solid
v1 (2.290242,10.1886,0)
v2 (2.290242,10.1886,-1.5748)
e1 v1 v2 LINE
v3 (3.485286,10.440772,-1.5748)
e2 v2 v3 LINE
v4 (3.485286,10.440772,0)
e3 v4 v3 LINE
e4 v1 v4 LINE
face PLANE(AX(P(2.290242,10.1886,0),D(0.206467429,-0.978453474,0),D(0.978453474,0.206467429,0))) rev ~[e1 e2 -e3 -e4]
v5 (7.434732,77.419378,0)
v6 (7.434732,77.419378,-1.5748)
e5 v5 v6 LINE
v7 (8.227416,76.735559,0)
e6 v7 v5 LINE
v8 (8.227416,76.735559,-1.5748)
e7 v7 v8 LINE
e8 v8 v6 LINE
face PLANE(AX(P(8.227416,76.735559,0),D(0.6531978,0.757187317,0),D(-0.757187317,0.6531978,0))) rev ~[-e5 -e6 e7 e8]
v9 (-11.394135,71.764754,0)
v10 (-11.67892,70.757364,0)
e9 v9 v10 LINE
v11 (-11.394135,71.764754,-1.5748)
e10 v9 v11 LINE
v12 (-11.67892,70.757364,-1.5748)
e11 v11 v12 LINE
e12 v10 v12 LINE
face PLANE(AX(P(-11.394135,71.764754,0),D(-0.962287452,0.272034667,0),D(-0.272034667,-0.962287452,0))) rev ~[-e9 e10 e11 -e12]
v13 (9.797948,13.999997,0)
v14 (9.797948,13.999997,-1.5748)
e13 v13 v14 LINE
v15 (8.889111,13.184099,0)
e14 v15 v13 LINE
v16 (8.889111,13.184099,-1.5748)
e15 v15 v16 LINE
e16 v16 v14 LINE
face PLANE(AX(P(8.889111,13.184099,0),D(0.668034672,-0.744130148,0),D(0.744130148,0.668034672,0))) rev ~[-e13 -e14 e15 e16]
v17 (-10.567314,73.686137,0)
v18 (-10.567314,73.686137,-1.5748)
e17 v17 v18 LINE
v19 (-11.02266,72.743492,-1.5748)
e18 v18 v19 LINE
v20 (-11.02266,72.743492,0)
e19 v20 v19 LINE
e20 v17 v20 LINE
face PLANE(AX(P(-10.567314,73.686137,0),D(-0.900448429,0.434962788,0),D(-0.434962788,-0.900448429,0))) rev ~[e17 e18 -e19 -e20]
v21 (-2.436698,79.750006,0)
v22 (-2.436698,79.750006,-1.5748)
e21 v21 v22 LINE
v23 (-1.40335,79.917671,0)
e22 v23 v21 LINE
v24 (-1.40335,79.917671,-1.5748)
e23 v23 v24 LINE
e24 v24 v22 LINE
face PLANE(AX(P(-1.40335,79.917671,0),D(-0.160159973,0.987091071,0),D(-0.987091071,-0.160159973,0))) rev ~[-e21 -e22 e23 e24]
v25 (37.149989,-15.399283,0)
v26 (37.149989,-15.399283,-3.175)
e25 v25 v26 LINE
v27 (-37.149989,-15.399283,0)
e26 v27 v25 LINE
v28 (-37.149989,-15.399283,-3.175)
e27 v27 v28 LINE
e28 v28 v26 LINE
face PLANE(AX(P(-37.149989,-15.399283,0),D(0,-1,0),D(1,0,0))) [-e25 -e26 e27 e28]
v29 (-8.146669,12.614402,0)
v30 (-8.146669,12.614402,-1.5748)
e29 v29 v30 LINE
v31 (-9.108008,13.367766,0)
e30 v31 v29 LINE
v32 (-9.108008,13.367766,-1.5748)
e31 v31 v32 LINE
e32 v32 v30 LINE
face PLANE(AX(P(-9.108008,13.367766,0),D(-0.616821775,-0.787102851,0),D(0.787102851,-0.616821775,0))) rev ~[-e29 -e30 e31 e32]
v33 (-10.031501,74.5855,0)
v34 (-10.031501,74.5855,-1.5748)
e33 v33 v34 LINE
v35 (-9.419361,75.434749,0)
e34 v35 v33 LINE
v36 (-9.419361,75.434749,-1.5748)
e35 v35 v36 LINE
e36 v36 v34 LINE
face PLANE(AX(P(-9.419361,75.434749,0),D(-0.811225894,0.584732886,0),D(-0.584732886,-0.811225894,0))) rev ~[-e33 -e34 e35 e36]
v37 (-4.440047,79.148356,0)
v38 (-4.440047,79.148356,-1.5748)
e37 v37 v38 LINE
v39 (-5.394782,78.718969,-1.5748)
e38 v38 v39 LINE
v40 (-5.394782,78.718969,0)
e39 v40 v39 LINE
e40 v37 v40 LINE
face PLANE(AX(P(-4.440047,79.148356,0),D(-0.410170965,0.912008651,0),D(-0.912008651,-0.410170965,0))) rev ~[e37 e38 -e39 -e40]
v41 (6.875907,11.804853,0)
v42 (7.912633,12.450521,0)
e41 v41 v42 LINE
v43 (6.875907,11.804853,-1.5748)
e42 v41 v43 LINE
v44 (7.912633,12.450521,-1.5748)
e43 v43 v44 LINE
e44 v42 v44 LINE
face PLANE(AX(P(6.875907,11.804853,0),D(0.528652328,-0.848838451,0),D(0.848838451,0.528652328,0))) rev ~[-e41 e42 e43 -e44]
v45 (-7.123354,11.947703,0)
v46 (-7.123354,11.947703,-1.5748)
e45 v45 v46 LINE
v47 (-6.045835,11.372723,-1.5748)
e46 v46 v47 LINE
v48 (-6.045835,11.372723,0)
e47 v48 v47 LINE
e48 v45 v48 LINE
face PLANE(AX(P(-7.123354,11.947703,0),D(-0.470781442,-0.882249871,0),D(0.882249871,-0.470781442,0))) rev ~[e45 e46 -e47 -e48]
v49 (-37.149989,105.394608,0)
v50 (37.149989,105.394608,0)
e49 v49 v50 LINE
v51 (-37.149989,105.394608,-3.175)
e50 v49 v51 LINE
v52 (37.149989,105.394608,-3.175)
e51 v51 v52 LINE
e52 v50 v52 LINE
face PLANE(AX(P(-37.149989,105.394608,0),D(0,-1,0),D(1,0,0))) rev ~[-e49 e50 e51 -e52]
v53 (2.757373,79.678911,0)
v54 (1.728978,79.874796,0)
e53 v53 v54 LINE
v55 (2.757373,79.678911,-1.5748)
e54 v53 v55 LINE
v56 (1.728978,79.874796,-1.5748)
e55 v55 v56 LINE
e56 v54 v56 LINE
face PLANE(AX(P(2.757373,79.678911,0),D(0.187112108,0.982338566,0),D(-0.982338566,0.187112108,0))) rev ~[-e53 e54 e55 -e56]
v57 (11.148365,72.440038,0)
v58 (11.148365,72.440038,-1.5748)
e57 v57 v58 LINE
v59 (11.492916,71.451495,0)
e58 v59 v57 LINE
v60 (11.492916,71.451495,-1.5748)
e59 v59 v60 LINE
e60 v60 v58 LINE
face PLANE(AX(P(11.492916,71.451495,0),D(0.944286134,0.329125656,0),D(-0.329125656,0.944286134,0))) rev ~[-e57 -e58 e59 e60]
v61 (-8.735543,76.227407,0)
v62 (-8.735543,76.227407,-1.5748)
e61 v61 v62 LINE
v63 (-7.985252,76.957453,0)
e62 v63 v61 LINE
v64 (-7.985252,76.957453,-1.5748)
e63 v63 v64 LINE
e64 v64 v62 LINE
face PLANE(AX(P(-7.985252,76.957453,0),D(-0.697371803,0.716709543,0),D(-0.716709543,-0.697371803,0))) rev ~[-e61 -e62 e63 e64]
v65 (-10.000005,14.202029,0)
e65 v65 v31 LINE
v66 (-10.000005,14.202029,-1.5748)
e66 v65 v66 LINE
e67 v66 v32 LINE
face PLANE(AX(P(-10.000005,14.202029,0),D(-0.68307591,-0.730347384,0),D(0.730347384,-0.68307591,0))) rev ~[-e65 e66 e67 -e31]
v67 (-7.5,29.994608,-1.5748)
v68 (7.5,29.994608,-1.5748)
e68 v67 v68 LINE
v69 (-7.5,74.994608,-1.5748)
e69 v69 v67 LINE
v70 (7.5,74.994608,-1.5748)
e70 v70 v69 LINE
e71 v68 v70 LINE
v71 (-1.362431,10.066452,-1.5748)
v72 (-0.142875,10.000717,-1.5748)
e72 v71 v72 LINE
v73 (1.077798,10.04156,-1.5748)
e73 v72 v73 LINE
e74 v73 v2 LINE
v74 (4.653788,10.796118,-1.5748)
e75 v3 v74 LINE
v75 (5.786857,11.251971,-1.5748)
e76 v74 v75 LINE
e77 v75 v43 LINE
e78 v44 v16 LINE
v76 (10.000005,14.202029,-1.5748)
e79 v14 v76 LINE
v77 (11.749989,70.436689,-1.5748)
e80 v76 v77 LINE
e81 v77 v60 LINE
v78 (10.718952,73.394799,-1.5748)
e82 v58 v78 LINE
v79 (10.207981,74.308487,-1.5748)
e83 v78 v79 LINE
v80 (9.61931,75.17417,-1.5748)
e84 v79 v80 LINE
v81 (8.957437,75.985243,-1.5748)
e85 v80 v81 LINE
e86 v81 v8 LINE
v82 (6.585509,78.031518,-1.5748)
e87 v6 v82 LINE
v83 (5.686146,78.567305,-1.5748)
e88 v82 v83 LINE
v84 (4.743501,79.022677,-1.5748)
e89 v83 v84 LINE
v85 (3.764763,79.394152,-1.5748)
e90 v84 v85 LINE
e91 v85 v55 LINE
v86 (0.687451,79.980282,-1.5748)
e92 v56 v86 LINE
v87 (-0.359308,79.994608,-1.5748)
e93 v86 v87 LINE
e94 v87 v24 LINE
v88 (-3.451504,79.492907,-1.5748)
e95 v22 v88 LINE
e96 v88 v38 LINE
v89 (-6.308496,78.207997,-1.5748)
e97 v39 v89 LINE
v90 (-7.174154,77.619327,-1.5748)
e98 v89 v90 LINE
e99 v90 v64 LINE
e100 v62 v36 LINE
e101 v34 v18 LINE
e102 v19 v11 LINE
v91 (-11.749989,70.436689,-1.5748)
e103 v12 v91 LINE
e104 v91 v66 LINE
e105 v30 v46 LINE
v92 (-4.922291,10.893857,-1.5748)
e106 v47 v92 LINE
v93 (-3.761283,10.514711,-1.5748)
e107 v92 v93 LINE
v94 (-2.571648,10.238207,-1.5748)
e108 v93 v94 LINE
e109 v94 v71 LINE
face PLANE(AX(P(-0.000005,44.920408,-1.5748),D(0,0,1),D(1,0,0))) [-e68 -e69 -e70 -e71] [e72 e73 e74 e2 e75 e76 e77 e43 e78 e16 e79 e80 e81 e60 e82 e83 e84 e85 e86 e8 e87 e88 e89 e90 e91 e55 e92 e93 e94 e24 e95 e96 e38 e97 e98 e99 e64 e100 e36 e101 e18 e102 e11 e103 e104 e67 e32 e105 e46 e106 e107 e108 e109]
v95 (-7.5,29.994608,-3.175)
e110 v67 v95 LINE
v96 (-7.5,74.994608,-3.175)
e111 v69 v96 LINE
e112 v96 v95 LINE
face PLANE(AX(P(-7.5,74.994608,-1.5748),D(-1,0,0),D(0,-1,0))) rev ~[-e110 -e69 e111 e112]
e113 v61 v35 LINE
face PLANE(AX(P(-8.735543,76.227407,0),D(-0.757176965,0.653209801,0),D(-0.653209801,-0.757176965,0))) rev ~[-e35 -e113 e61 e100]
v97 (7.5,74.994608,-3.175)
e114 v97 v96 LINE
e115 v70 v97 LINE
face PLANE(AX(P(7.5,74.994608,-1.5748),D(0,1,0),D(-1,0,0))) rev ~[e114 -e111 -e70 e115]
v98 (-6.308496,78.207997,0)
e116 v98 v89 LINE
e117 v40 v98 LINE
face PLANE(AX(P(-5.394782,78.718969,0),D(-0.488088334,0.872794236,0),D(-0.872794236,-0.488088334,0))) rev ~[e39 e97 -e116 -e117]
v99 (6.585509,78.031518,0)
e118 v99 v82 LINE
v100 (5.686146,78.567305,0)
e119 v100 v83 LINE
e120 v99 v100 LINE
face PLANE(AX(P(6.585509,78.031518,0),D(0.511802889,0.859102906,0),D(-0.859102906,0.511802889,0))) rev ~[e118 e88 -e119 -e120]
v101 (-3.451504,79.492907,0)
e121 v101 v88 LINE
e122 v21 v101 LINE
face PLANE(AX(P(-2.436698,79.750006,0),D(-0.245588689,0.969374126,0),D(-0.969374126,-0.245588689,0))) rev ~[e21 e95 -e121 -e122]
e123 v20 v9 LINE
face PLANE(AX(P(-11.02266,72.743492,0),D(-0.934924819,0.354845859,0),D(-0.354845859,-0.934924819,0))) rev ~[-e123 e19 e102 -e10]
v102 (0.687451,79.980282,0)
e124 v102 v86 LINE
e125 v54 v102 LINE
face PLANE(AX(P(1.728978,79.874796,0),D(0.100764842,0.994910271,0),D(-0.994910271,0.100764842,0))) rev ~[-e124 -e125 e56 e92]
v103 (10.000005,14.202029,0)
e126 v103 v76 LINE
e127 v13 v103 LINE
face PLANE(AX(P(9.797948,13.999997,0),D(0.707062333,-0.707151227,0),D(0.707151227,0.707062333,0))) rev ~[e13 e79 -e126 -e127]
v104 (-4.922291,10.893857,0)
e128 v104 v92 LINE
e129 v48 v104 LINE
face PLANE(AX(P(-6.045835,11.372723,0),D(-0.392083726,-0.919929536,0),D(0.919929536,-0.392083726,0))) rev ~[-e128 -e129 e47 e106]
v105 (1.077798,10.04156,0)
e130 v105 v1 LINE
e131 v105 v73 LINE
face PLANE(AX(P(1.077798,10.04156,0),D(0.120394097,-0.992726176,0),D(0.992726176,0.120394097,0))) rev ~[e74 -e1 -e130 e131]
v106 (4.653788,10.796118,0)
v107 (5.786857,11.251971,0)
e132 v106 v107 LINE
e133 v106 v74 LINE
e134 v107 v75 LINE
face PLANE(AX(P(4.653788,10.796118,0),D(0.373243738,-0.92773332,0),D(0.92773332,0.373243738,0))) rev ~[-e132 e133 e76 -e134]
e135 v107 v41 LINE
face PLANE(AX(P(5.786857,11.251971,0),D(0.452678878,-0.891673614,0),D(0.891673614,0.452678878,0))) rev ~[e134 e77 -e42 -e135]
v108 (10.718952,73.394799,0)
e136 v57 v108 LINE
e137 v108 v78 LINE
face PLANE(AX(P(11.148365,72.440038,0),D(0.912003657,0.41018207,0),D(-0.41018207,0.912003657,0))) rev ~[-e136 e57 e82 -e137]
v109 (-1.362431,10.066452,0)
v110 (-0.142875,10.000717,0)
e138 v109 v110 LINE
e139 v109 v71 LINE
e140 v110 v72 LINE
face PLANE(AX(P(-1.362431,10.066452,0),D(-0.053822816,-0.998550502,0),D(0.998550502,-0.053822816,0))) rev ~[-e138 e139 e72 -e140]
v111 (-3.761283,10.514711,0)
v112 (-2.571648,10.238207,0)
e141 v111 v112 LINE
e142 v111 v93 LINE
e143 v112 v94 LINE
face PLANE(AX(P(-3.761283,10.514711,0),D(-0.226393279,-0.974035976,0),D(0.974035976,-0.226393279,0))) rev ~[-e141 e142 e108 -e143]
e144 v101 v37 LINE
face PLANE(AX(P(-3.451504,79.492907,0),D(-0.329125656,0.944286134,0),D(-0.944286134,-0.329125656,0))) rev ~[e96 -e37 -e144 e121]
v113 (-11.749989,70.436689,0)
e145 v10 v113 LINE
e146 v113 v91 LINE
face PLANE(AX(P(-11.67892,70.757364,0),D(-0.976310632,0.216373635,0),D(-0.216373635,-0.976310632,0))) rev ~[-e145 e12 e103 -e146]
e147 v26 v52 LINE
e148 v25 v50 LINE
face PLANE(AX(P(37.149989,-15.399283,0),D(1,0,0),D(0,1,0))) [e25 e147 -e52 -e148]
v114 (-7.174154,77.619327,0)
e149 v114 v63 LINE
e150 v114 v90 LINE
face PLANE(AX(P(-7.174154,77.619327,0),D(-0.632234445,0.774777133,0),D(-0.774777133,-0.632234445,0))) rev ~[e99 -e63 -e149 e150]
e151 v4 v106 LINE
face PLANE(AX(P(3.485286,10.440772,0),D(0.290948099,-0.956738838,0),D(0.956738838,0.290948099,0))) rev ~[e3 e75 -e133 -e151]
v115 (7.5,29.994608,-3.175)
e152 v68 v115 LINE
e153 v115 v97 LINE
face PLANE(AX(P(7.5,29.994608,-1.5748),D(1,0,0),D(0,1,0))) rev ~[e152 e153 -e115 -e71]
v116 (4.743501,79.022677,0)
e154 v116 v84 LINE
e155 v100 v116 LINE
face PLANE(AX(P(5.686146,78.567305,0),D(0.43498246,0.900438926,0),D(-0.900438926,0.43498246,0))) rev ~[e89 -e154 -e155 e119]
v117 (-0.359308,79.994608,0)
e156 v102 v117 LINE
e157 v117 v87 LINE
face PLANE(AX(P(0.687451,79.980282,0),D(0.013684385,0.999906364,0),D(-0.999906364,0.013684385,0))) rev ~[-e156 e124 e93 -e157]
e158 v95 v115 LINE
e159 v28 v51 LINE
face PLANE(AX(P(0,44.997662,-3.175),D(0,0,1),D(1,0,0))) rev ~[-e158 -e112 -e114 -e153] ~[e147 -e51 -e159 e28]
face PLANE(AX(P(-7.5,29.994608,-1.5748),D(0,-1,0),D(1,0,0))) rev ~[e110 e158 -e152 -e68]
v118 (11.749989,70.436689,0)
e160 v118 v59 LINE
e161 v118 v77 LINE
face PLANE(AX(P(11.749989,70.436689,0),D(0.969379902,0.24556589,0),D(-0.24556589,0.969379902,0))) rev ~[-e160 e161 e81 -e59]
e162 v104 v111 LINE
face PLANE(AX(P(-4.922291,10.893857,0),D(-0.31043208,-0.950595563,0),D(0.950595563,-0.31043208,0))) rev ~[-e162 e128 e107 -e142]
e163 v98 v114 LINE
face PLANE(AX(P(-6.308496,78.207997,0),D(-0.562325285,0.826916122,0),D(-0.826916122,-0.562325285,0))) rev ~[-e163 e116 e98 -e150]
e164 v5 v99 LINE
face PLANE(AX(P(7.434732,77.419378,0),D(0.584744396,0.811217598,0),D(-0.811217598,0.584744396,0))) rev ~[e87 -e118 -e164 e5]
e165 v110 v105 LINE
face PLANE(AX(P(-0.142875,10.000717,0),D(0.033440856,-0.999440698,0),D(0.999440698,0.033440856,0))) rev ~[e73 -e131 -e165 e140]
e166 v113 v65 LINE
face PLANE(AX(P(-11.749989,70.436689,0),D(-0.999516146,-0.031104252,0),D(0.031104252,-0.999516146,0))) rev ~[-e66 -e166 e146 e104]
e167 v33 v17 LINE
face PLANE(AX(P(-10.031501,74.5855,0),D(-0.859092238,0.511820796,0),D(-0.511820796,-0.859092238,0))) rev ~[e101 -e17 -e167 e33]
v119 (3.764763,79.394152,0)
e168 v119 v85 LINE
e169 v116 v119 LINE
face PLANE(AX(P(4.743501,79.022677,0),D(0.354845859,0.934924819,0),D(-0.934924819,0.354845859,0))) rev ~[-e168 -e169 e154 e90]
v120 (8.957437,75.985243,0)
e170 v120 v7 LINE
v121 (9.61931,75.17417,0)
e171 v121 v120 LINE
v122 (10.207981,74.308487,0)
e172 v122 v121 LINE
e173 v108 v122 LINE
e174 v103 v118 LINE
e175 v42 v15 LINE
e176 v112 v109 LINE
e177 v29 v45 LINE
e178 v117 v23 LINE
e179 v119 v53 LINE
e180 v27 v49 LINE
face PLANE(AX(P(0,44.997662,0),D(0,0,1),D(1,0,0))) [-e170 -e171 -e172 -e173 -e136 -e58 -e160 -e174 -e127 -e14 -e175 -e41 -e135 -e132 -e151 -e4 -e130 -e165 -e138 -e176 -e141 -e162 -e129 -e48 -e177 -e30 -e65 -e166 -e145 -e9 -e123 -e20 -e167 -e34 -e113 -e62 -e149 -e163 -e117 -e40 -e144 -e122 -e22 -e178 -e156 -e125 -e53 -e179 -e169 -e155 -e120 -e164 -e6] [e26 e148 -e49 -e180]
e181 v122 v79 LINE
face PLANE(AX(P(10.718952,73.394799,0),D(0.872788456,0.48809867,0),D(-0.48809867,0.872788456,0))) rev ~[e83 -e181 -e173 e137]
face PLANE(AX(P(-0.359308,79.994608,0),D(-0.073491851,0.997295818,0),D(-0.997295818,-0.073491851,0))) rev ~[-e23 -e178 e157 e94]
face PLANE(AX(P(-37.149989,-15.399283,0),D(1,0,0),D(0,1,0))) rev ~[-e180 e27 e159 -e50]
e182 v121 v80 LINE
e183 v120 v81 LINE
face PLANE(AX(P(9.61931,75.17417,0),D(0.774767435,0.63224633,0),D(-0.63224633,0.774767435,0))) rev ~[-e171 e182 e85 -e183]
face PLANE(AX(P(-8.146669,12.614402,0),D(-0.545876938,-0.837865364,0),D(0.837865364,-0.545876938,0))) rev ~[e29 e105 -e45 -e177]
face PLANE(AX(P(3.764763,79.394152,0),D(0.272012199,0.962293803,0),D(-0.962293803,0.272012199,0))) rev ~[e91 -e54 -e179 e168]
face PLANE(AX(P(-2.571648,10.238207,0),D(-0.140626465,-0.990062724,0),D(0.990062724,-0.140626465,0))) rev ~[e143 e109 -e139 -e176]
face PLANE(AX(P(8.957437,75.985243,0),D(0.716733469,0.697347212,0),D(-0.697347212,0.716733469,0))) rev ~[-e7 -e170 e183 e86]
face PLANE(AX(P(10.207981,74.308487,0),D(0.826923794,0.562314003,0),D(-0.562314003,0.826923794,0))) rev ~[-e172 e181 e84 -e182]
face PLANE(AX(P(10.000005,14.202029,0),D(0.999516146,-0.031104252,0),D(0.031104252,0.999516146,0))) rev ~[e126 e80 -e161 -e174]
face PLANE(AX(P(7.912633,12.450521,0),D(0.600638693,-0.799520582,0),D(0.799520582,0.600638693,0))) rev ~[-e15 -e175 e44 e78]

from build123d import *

# Parameters (mm, degrees)
F1_W     = 74.2999784
F1_H     = 120.793891
F2_DEPTH = 3.175
F3_DEPTH = 1.5748
F5_DEPTH = 1.6012
F7_DEPTH = 187


# Not quite as in the source:
# - an extrude ends at something that could not be found from the text; its depth is read off the source's solid


with BuildPart() as f2:
    # F1 (on Top) → F2 (new body)
    with BuildSketch(Plane.XY):
        with Locations((0, 44.9976621)):
            Rectangle(F1_W, F1_H)
    extrude(amount=-F2_DEPTH)

    # F0 (on Top) → F3 (cut)
    with BuildSketch(Plane.XY):
        Polygon((-11.67892, 70.7573642), (-11.7499892, 70.4366892), (-10.0000054, 14.202029), (-9.1080082, 13.367766), (-8.146669, 12.614402), (-7.1233538, 11.9477028), (-6.045835, 11.372723), (-4.9222914, 10.8938568), (-3.7612828, 10.514711), (-2.5716484, 10.2382066), (-1.3624306, 10.0664518), (-0.142875, 10.0007166), (1.0777982, 10.0415598), (2.2902418, 10.1886004), (3.4852864, 10.4407716), (4.653788, 10.7961176), (5.7868566, 11.2519714), (6.875907, 11.8048532), (7.9126334, 12.4505212), (8.889111, 13.1840986), (9.7979484, 13.9999974), (10.0000054, 14.202029), (11.7499892, 70.4366892), (11.4929158, 71.4514954), (11.1483648, 72.440038), (10.7189524, 73.3947986), (10.2079806, 74.3084874), (9.6193102, 75.1741702), (8.957437, 75.985243), (8.2274156, 76.735559), (7.4347324, 77.4193778), (6.5855088, 78.0315178), (5.6861456, 78.5673054), (4.7435008, 79.0226766), (3.7647626, 79.3941516), (2.7573732, 79.678911), (1.728978, 79.8747958), (0.687451, 79.980282), (-0.3593084, 79.9946076), (-1.40335, 79.917671), (-2.4366982, 79.7500056), (-3.4515044, 79.4929068), (-4.440047, 79.1483558), (-5.3947822, 78.7189688), (-6.3084964, 78.207997), (-7.1741538, 77.6193266), (-7.985252, 76.9574534), (-8.7355426, 76.2274066), (-9.4193614, 75.4347488), (-10.0315014, 74.5854998), (-10.5673144, 73.6861366), (-11.0226602, 72.7434918), (-11.3941352, 71.7647536), align=None)
    extrude(amount=-F3_DEPTH, mode=Mode.SUBTRACT)

    # F4 (on face) → F5 (cut, through all)
    with BuildSketch(Plane.XY.offset(-1.5748)):
        Polygon((7.5, 74.9946076), (-7.5, 74.9946076), (-7.5, 29.9946076), (0, 29.9946076), (7.5, 29.9946076), align=None)
    extrude(amount=-F5_DEPTH, mode=Mode.SUBTRACT)

    # F6 (on Top) → F7 (cut, through all)
    with BuildSketch(Plane.XY):
        Polygon((-10.7912024307, 73.8066075367), (-11.2561967507, 72.8439886266), (-11.6355402146, 71.8445191089), (-11.9253249204, 70.8194431888), (-12.0048558585, 70.4605875443), (-10.2505992593, 14.0886235531), (-9.2734099156, 13.1746824405), (-8.2946132005, 12.4076376674), (-7.2527155028, 11.7288318004), (-6.155627842, 11.1434097699), (-5.0116809128, 10.6558474546), (-3.8295896081, 10.2698167625), (-2.6183487878, 9.9882904244), (-1.3871727116, 9.8134167162), (-0.1454684467, 9.7464876822), (1.0973724592, 9.7880726041), (2.3318323641, 9.9377832588), (3.5485785618, 10.1945338008), (4.7383012319, 10.5563332129), (5.8919487163, 11.0204662668), (7.0007735223, 11.5833870046), (8.0563268906, 12.240780346), (9.0505396482, 12.9876812578), (9.9727120125, 13.8155513756), (10.250752791, 14.0935572024), (12.00497648, 70.4644636422), (11.7364147609, 71.5246203819), (11.3845631065, 72.5341091055), (10.9460529906, 73.5090976745), (10.4242555991, 74.442144141), (9.8231127621, 75.3261685703), (9.1472184874, 76.1544230786), (8.4017288342, 76.9206373493), (7.5922505458, 77.6189446578), (6.7250358763, 78.2440530365), (5.8066165367, 78.7911931616), (4.8440002256, 79.2562121642), (3.8445253314, 79.6355576688), (2.8157931282, 79.9263500525), (1.7656080971, 80.1263852965), (0.7020137501, 80.2341064847), (-0.3669184196, 80.2487355339), (-1.4330803845, 80.1701688593), (-2.4883265282, 79.9989504193), (-3.5246322079, 79.7364047759), (-4.5341166426, 79.3845546164), (-5.509078548, 78.9460707649), (-6.4421534102, 78.4242719991), (-7.3261519012, 77.8231291621), (-8.154434062, 77.1472334884), (-8.9206223557, 76.4017179349), (-9.6189282578, 75.5922672148), (-10.2440360096, 74.725027477), align=None)
    extrude(amount=F7_DEPTH, mode=Mode.SUBTRACT)


solid = f2.part
